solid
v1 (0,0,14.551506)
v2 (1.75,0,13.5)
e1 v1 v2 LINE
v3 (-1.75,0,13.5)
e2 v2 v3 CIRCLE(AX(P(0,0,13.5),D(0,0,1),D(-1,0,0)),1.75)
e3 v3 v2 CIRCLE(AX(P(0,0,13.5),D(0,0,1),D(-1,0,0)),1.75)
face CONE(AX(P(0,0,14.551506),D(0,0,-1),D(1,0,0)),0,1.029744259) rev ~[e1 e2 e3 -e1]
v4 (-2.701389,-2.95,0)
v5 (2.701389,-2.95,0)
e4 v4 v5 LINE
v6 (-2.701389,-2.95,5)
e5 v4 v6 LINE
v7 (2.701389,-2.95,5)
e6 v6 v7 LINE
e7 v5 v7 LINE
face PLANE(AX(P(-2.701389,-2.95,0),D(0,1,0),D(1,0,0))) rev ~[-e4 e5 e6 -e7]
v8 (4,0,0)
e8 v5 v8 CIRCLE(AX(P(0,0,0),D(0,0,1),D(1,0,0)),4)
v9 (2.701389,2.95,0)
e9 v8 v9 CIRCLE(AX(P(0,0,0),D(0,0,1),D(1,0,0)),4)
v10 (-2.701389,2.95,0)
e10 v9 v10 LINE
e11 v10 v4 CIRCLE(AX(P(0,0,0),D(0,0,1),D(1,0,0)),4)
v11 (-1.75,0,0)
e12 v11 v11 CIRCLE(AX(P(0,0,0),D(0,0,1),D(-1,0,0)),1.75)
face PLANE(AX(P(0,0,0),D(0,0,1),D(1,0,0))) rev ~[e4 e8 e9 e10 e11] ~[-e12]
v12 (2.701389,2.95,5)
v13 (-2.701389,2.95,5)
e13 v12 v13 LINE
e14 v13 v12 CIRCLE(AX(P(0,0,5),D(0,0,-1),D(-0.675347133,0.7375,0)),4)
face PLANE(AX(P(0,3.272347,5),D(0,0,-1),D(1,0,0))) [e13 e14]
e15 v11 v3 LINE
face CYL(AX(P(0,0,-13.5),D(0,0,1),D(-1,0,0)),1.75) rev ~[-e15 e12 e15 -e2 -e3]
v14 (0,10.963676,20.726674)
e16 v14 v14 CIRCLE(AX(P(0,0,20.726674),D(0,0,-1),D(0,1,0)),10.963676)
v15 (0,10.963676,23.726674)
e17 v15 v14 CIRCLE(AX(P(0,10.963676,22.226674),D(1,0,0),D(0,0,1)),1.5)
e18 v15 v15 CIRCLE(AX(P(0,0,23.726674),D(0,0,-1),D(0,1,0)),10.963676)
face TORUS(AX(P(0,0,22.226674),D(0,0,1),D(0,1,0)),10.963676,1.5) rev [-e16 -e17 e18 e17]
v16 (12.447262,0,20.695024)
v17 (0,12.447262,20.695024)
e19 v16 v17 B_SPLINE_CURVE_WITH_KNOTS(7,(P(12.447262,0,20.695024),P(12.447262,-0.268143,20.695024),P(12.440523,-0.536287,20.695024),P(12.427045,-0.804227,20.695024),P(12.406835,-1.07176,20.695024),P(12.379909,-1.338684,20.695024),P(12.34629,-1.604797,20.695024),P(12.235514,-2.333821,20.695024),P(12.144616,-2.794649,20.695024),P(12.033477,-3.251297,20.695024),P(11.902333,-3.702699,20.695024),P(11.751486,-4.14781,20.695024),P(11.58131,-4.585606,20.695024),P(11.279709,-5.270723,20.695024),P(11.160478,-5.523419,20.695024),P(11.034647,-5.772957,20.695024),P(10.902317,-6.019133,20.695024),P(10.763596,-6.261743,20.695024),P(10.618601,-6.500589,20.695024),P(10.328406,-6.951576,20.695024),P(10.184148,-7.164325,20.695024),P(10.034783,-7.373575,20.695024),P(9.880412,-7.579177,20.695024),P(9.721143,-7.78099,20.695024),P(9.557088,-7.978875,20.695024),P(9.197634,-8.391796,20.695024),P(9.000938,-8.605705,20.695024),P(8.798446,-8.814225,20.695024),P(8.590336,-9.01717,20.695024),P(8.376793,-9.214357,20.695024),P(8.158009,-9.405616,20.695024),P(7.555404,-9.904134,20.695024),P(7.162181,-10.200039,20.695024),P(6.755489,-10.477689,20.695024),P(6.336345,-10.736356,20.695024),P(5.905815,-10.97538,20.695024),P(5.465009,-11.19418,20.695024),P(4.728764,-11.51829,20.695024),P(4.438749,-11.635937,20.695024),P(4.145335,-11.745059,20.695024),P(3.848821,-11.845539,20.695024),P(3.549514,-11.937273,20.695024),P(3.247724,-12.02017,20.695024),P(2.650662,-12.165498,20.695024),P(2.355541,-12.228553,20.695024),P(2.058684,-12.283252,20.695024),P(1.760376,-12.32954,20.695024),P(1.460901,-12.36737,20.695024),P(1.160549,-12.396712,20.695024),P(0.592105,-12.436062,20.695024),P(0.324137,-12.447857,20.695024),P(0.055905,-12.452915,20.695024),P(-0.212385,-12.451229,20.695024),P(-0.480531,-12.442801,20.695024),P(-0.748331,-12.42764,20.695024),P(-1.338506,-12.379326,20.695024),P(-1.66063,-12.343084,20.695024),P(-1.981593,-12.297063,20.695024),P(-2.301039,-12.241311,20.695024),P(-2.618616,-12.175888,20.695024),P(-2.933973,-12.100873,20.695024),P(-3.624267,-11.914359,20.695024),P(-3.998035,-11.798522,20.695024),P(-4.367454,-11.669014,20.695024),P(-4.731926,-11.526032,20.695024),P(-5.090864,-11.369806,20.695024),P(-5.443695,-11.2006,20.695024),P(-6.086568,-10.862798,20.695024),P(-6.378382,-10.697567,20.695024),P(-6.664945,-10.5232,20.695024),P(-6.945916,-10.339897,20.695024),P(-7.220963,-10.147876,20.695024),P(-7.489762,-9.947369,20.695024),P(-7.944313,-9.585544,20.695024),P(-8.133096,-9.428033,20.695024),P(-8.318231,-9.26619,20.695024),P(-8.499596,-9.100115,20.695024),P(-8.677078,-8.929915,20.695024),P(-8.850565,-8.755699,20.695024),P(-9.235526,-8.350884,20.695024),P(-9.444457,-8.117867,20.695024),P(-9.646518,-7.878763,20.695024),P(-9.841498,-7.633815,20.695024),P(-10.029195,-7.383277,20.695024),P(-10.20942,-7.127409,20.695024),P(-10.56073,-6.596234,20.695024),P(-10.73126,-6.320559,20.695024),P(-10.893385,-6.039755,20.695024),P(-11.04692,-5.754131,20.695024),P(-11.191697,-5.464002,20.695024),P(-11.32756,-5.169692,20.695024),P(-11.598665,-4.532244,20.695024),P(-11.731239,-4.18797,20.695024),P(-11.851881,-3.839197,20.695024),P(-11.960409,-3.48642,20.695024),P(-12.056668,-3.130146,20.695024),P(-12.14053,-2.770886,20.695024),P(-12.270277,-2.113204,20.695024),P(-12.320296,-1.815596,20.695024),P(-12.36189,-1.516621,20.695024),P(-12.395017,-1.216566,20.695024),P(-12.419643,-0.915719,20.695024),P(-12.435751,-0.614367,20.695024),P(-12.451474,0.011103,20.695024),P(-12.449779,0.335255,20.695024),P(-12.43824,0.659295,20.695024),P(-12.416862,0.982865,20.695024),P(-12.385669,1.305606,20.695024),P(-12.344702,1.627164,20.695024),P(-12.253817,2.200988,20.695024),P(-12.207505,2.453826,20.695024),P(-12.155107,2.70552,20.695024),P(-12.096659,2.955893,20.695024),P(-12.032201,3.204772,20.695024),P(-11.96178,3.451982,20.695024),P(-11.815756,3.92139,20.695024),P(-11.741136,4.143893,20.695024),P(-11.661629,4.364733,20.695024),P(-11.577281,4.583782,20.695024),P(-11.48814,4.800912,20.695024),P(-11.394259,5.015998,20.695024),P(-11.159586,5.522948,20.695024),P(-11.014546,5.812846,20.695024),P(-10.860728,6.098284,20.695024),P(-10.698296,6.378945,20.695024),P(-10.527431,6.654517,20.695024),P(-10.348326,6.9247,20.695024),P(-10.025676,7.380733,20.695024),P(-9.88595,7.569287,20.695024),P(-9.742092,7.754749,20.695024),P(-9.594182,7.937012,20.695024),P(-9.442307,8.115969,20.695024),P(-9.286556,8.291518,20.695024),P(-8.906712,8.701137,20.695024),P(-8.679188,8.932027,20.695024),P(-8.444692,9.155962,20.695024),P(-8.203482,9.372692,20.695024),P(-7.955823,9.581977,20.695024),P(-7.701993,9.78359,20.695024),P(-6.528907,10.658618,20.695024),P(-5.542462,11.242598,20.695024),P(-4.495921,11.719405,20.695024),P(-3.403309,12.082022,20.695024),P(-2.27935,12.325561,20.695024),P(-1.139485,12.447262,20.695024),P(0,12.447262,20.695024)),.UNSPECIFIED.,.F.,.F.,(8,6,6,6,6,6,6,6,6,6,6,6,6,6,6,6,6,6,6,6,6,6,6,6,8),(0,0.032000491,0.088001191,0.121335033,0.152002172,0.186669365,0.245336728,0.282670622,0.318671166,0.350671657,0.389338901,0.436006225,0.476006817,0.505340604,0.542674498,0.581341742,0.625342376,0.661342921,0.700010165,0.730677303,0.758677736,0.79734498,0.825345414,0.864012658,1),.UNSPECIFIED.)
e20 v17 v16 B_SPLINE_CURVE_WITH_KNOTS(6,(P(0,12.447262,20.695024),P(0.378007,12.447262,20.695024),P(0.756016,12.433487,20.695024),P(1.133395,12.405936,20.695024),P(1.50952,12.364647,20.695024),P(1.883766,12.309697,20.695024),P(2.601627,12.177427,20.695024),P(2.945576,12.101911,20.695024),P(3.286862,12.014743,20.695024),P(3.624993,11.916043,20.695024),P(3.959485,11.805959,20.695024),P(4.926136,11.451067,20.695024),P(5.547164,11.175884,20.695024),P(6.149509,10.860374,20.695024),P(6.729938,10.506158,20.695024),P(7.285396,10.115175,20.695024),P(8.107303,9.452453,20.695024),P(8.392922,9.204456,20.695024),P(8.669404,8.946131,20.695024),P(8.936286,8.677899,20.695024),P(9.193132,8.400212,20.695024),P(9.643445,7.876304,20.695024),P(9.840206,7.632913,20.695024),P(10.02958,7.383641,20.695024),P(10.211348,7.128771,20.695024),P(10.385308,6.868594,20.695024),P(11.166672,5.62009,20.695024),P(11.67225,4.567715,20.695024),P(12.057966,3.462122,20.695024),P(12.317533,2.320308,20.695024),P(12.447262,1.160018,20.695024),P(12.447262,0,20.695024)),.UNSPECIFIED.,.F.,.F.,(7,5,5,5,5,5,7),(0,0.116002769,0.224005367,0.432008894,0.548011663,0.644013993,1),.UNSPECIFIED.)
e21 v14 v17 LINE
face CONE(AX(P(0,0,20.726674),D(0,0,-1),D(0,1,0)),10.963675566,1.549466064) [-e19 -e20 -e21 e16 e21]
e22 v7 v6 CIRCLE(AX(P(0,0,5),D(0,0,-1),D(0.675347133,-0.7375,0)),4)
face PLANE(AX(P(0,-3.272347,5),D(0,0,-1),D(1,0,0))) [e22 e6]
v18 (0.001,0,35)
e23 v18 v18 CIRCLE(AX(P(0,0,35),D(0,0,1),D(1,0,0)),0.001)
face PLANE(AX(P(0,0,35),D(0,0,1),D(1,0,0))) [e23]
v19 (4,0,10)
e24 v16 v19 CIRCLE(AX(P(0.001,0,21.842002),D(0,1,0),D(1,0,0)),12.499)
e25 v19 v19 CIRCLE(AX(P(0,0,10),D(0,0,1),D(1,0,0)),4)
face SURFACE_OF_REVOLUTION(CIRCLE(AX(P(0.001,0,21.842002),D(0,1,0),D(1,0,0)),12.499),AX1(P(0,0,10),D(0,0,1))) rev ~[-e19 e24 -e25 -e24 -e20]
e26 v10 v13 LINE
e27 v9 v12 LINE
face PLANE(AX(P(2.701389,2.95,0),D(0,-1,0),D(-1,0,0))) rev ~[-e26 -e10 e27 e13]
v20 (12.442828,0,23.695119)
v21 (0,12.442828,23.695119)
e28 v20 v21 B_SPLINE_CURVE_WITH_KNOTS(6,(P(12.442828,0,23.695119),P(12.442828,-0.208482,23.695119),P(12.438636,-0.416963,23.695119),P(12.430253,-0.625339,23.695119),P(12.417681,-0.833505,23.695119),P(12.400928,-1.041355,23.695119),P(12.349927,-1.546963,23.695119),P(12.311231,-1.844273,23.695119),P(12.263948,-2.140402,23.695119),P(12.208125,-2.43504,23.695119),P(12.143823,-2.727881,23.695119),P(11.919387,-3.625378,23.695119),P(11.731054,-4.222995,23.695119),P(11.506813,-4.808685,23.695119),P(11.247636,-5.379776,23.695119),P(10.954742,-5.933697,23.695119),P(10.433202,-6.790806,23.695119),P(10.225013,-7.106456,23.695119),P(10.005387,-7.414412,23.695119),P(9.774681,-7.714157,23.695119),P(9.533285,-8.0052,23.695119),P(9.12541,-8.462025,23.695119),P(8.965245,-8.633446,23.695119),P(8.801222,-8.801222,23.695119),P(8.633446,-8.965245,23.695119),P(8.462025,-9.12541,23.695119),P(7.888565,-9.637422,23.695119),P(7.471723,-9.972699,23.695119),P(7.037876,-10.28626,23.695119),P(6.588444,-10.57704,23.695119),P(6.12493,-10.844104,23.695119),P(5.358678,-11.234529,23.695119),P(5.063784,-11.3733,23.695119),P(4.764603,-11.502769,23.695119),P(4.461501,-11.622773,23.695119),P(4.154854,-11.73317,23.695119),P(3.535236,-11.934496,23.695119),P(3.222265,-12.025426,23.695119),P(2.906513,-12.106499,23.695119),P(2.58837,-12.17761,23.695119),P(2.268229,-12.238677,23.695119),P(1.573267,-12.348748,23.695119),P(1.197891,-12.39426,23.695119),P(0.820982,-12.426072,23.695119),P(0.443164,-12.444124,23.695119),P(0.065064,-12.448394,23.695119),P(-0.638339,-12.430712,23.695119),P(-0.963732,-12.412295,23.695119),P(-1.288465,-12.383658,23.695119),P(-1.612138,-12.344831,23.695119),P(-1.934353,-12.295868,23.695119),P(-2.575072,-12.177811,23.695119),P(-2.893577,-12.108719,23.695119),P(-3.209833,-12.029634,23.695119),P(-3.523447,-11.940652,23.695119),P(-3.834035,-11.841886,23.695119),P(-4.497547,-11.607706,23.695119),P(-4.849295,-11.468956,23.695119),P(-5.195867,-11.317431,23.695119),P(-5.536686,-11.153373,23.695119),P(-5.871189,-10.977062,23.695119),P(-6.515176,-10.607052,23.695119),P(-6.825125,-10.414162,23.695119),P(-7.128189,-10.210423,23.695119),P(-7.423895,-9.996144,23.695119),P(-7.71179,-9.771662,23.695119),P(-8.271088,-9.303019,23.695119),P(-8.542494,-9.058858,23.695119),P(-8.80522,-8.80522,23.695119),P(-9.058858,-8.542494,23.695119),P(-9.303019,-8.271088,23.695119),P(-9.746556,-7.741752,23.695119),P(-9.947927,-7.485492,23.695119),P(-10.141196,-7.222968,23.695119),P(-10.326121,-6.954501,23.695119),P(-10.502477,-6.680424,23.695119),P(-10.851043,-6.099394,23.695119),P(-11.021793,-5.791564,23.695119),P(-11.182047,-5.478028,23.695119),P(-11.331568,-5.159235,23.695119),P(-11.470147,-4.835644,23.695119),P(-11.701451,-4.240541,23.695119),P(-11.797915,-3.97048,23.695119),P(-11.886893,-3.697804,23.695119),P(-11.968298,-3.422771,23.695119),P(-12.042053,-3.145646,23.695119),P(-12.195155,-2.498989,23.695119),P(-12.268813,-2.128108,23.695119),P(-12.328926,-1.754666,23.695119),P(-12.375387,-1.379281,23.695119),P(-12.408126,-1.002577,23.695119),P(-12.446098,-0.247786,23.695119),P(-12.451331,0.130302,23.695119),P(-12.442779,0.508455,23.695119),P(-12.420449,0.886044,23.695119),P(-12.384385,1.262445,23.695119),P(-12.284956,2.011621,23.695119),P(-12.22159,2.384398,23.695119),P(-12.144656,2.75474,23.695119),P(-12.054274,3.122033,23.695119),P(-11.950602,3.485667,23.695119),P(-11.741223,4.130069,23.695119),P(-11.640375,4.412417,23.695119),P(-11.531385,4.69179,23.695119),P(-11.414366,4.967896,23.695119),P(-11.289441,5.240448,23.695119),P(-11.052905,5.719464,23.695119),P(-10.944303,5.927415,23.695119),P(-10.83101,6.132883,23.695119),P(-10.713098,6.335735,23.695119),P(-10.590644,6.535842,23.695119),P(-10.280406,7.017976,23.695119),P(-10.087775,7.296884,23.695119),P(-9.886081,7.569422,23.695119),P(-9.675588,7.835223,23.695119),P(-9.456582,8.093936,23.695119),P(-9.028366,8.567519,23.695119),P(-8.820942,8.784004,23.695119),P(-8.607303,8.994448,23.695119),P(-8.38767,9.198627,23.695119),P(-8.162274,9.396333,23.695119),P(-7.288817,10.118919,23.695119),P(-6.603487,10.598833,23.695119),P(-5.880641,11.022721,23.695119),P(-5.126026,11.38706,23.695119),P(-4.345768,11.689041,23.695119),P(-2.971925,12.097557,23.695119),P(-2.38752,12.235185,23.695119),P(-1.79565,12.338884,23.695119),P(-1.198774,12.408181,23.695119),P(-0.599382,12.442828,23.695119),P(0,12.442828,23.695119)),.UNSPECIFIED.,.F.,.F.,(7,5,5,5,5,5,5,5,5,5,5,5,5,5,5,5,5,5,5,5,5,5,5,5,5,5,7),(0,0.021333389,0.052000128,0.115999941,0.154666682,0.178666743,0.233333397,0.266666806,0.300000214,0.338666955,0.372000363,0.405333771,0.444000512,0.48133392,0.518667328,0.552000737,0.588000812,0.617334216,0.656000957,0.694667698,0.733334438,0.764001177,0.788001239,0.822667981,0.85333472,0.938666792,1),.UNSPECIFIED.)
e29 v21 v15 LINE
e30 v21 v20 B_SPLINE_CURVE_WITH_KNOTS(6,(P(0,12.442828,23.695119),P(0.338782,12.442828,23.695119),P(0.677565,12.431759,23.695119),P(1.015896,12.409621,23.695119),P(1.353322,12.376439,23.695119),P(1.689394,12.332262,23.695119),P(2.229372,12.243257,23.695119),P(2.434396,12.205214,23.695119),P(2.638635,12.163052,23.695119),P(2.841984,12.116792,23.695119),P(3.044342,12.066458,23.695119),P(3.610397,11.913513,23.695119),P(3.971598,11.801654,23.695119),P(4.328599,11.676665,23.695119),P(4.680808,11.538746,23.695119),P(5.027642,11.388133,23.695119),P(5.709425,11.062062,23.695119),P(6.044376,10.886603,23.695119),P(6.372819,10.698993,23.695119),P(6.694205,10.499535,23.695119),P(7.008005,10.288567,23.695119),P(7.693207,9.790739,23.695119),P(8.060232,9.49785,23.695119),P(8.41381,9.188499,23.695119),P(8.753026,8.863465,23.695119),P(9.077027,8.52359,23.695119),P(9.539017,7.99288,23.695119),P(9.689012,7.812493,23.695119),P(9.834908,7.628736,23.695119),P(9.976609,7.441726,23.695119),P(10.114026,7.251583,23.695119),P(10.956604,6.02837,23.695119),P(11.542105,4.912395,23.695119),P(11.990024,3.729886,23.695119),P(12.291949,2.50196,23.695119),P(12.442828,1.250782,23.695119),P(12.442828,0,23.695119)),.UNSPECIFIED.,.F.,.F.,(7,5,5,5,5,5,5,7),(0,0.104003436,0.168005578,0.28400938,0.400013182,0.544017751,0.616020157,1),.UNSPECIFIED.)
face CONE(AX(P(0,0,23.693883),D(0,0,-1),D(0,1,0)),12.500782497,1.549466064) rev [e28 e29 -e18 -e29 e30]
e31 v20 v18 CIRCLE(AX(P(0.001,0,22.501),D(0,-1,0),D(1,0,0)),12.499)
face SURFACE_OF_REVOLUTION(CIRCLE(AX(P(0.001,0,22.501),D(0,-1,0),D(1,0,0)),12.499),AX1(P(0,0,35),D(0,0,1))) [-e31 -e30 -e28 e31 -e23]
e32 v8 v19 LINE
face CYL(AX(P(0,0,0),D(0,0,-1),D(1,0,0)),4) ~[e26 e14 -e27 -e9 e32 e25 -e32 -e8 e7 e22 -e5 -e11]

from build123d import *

# Parameters (mm, degrees)
F0_R      = 4
F1_DEPTH  = 10
F2_R      = 12.5
F3_DEPTH  = 25
F9_D      = 3.5
F9_DEPTH  = 13.5
F9_TIP    = 1.0515060833
F10_DEPTH = 5


# Not quite as in the source:
# - a fillet or chamfer that OpenCascade refuses, or shapes differently, is made with other operations: its cross-section is extruded or revolved along the edge and cut away or added


with BuildPart() as f1:
    # F0 (on Top) → F1 (new body)
    with BuildSketch(Plane.XY):
        Circle(F0_R)
    extrude(amount=F1_DEPTH)

    # F2 (on face) → F3 (join)
    with BuildSketch(Plane.XY.offset(10)):
        Circle(F2_R)
    extrude(amount=F3_DEPTH)

    # F4: fillet of radius 12.499 on 2 edges, made by hand

    # F4_s1 → F4_t2 (revolve, cut)
    with BuildSketch(Plane.XZ):
        with BuildLine():
            ThreePointArc((12.5, 22.501), (8.8391276581, 31.3391276581), (0.001, 35))
            Line((0.001, 35), (12.5, 35))
            Line((12.5, 35), (12.5, 22.501))
        make_face()
    revolve(axis=Axis((0, 0, 35), (0, 0, 1)), mode=Mode.SUBTRACT)

    # F4_s3 → F4_t4 (revolve, cut)
    with BuildSketch(Plane.XZ):
        with BuildLine():
            ThreePointArc((12.5, 21.84200152), (10.1550263443, 14.5536032049), (4, 10))
            Line((4, 10), (12.5, 10))
            Line((12.5, 10), (12.5, 21.84200152))
        make_face()
    revolve(axis=Axis((0, 0, 10), (0, 0, 1)), mode=Mode.SUBTRACT)

    # F5 (on Right) → F6 (revolve, cut)
    with BuildSketch(Plane.YZ):
        with BuildLine():
            Line((12.5007824972, 23.6938826144), (10.963675566, 23.7266744822))
            ThreePointArc((10.963675566, 23.7266744822), (9.463675566, 22.2266744822), (10.963675566, 20.7266744822))
            Line((10.963675566, 20.7266744822), (12.5007824972, 20.6938826144))
            Line((12.5007824972, 20.6938826144), (12.5007824972, 23.6938826144))
        make_face()
    revolve(axis=Axis((0, 0, 10), (0, 0, -1)), mode=Mode.SUBTRACT)

    # F9
    with Locations(Plane(origin=(0, 0, 0), x_dir=(1, 0, 0), z_dir=(0, 0, -1))):
        with Locations((0, 0)):
            Hole(F9_D / 2, depth=F9_DEPTH)
            with Locations((0, 0, -(F9_DEPTH + F9_TIP / 2))):  # 118° drill point
                Cone(0, F9_D / 2, F9_TIP, mode=Mode.SUBTRACT)

    # F7 (on face) → F10 (cut)
    with BuildSketch(Plane(origin=(0, 0, 0), x_dir=(1, 0, 0), z_dir=(0, 0, -1))):
        with BuildLine():
            ThreePointArc((-2.7013885318, -2.95), (0, -4), (2.7013885318, -2.95))
            Line((2.7013885318, -2.95), (-2.7013885318, -2.95))
        make_face()
        with BuildLine():
            Line((-2.7013885318, 2.95), (2.7013885318, 2.95))
            ThreePointArc((2.7013885318, 2.95), (0, 4), (-2.7013885318, 2.95))
        make_face()
    extrude(amount=-F10_DEPTH, mode=Mode.SUBTRACT)


solid = f1.part
